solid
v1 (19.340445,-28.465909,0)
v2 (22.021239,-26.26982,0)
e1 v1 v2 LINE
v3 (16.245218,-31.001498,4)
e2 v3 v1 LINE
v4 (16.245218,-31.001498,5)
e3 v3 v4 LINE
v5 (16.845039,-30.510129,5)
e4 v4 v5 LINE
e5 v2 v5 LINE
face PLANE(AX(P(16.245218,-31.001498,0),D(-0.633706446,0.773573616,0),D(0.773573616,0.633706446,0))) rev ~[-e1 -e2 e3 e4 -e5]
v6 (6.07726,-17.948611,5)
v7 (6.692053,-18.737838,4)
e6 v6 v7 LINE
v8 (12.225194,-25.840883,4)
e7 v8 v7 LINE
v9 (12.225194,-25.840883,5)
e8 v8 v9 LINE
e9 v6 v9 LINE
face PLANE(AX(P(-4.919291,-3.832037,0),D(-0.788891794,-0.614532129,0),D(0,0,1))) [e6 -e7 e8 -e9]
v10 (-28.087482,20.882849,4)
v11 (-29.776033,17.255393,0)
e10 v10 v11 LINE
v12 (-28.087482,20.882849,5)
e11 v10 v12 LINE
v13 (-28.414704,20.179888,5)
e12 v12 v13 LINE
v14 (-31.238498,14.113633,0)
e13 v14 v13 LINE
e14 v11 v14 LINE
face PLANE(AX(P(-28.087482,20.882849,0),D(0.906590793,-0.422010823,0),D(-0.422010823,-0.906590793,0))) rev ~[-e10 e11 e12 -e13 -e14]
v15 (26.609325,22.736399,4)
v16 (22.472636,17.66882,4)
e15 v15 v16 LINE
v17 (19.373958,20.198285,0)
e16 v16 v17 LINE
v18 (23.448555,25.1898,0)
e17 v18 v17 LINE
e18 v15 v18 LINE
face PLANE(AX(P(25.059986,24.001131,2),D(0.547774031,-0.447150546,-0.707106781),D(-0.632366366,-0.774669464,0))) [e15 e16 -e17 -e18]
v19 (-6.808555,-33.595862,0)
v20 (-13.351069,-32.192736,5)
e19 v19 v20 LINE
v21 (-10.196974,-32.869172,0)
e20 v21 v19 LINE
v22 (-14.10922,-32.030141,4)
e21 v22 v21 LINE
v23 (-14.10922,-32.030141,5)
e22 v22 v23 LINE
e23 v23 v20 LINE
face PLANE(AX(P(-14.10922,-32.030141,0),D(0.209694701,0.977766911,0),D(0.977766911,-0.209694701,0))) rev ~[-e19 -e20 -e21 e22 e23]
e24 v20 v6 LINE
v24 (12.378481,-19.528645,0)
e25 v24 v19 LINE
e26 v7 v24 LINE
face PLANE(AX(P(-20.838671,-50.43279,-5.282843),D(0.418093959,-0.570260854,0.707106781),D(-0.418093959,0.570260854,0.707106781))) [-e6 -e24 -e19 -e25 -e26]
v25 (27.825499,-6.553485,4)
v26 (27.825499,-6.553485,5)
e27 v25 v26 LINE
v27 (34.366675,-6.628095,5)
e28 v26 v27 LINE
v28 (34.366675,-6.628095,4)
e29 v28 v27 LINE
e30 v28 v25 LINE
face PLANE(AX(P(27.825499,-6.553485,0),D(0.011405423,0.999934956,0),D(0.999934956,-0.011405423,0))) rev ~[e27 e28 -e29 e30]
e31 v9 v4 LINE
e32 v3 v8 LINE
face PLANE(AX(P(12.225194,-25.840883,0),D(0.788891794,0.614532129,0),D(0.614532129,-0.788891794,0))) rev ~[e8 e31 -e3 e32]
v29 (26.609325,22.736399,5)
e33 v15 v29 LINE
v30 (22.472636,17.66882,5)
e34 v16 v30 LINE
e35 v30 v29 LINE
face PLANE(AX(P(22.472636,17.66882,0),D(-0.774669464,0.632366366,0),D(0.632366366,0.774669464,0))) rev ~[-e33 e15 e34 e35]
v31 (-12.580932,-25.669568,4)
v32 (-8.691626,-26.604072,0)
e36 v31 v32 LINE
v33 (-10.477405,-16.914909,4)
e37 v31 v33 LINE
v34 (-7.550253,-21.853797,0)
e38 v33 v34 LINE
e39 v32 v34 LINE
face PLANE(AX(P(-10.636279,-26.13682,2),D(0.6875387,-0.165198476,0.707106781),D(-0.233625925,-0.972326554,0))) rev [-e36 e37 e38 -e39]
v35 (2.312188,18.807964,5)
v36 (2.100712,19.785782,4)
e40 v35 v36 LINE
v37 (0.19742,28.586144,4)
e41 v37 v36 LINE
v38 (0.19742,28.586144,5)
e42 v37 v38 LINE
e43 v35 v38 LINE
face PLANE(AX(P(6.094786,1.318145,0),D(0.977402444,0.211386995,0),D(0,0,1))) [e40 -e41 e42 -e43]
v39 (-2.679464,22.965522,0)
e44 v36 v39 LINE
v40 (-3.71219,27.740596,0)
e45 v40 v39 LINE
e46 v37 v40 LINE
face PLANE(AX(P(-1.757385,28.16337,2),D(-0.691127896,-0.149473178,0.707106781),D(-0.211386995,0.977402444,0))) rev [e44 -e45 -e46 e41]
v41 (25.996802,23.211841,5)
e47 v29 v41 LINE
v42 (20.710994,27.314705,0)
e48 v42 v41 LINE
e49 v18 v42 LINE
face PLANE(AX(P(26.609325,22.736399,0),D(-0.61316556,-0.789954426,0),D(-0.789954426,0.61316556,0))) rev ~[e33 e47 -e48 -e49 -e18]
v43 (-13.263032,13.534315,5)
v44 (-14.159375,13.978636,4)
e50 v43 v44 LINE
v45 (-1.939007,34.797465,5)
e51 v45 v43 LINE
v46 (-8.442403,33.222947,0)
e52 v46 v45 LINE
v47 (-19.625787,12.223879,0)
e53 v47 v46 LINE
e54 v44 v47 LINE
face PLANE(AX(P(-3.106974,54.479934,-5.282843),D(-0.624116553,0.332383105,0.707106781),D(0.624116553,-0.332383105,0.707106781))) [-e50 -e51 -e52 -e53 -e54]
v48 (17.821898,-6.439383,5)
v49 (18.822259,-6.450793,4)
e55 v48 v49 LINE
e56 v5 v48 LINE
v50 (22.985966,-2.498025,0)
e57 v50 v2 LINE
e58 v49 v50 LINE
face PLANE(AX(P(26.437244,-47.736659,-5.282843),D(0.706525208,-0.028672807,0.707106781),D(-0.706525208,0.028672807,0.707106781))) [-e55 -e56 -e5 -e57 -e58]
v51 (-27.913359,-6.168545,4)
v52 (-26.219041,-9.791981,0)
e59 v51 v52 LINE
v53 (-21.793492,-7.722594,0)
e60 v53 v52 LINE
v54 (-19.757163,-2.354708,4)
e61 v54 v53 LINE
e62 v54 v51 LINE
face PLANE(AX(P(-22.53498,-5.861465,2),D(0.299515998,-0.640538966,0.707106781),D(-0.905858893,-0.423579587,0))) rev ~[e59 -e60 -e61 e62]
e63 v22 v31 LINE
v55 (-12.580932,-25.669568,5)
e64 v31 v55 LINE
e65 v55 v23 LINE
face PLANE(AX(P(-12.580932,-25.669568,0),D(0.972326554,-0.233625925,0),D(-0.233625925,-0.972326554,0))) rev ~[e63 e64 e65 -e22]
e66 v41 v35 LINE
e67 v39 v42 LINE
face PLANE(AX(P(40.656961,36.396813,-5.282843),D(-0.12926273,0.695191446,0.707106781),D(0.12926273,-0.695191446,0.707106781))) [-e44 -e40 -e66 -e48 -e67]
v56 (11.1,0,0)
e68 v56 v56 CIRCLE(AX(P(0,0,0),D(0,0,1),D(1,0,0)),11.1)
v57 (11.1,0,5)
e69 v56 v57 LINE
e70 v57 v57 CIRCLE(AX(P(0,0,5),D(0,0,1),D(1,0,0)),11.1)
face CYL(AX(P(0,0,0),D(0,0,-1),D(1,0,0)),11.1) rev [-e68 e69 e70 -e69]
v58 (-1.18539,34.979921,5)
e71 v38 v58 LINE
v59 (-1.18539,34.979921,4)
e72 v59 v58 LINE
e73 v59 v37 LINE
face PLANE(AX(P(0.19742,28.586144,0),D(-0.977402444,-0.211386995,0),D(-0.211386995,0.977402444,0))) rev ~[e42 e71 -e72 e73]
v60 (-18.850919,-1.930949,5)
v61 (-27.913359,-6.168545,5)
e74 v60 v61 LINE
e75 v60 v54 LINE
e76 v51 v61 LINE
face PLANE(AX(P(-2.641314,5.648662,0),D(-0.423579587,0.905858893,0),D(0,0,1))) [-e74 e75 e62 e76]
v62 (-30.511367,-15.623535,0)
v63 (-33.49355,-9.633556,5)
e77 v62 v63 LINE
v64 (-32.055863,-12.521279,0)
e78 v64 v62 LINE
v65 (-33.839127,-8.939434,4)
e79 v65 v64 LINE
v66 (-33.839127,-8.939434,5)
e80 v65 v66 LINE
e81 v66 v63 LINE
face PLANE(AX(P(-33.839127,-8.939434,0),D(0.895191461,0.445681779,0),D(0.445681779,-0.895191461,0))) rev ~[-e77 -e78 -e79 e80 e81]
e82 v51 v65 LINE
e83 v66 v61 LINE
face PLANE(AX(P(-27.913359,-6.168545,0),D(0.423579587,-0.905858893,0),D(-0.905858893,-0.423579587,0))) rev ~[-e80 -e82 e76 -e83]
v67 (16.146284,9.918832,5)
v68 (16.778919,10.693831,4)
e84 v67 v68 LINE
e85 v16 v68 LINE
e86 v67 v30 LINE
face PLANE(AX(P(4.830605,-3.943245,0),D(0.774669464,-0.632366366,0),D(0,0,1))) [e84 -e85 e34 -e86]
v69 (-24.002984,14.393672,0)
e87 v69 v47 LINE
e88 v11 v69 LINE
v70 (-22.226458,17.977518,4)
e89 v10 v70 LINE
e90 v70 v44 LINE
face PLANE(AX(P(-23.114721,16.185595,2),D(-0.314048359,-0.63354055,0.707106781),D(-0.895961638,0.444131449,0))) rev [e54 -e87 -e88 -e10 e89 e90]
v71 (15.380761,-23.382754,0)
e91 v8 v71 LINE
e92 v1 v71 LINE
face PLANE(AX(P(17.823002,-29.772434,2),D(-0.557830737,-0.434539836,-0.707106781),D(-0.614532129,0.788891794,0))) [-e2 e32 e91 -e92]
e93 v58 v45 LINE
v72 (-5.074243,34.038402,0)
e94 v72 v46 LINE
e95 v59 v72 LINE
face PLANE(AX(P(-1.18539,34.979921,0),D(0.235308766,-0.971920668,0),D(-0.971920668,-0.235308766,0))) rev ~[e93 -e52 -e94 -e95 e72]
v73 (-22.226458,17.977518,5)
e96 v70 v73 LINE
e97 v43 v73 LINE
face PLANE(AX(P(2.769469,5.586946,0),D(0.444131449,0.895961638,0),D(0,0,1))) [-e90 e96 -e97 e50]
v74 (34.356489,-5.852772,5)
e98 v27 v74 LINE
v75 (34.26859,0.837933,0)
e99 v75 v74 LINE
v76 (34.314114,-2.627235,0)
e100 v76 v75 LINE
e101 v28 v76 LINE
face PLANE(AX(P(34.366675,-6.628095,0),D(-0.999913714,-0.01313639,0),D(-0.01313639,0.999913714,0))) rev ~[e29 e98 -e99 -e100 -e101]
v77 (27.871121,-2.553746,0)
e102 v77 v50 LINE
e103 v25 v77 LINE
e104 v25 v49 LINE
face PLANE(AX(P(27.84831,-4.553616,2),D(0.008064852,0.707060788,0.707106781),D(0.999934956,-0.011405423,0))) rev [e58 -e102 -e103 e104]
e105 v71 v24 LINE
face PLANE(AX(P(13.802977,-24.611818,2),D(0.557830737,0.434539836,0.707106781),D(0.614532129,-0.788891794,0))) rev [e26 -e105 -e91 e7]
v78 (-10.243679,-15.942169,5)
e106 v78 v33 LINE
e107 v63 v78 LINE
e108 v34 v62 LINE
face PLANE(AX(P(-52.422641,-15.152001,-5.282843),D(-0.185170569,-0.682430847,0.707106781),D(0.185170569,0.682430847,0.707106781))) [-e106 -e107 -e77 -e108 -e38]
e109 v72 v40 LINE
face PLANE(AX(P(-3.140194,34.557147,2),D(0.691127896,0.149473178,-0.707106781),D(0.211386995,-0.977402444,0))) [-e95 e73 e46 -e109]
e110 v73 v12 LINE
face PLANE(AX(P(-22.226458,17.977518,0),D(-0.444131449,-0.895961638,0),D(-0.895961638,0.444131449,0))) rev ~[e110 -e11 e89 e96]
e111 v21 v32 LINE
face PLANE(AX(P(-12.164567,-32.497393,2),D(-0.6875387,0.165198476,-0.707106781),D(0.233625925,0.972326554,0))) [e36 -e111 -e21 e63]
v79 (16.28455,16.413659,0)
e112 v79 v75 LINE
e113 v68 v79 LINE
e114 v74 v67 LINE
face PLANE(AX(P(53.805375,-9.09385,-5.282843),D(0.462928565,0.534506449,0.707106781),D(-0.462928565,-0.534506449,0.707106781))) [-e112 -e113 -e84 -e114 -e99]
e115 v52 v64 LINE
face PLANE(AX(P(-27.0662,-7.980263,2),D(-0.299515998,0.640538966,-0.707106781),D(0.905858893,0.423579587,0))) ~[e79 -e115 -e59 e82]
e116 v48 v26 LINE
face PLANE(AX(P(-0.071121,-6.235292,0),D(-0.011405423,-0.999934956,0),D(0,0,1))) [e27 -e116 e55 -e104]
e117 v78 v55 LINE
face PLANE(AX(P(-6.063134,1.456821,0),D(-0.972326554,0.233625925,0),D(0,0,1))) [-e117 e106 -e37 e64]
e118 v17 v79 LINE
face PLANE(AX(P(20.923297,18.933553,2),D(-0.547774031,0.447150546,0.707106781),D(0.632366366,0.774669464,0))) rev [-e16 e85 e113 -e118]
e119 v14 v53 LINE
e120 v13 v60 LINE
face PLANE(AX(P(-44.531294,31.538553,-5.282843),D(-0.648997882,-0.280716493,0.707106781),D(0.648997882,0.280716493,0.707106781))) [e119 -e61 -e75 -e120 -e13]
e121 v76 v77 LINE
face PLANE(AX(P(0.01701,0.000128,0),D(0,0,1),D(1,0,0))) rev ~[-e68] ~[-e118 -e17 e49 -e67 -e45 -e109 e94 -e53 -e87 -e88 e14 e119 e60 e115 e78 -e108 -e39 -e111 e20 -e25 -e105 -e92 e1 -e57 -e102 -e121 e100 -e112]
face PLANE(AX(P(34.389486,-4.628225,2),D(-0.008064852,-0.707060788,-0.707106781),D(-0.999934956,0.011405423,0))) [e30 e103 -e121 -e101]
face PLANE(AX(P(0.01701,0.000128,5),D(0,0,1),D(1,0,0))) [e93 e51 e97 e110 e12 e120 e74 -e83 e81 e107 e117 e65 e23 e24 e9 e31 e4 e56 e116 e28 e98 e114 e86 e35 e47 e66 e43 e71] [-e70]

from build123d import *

# Parameters (mm, degrees)
F0_R         = 11.1
F1_DEPTH     = 5
F2_T4_DEPTH  = 66.9224244324
F2_T10_DEPTH = 66.9224244324
F2_T16_DEPTH = 66.9224244324
F2_T22_DEPTH = 66.9224244324
F2_T28_DEPTH = 66.9224244324
F2_T34_DEPTH = 66.9224244324
F2_T40_DEPTH = 66.9224244324
F3_SIZE      = 4


# Not quite as in the source:
# - a fillet or chamfer that OpenCascade refuses, or shapes differently, is made with other operations: its cross-section is extruded or revolved along the edge and cut away or added


with BuildPart() as f1:
    # F0 (on Top) → F1 (new body)
    with BuildSketch(Plane.XY):
        with BuildLine():
            ThreePointArc((13.9102940248, -6.3947663514), (14.9558155311, -3.2730564225), (15.3097784616, 0))
            ThreePointArc((15.3097784616, 0), (14.9174264356, 3.4437922532), (13.7604803953, 6.7110726292))
            ThreePointArc((13.7604803953, 6.7110726292), (13.7168049275, 6.7998955231), (13.6725561219, 6.8884341936))
            ThreePointArc((13.6725561219, 6.8884341936), (9.4080501116, 12.077992782), (3.3325913325, 14.9426621308))
            ThreePointArc((3.3325913325, 14.9426621308), (3.2359155889, 14.9638954436), (3.1391045899, 14.9845032923))
            ThreePointArc((3.1391045899, 14.9845032923), (-3.577131702, 14.8860150924), (-9.6048069761, 11.9221222731))
            ThreePointArc((-9.6048069761, 11.9221222731), (-9.6816841888, 11.8597768872), (-9.7581567243, 11.7969357838))
            ThreePointArc((-9.7581567243, 11.7969357838), (-13.8686603838, 6.4845644188), (-15.3095897294, -0.0760188232))
            ThreePointArc((-15.3095897294, -0.0760188232), (-15.308778302, -0.1749955606), (-15.307326995, -0.2739649836))
            ThreePointArc((-15.307326995, -0.2739649836), (-13.7168049275, -6.7998955231), (-9.4859391577, -12.0169161951))
            ThreePointArc((-9.4859391577, -12.0169161951), (-9.4080501116, -12.077992782), (-9.3297678259, -12.1385645305))
            ThreePointArc((-9.3297678259, -12.1385645305), (-3.2359155889, -14.9638954436), (3.4808170776, -14.9088305717))
            ThreePointArc((3.4808170776, -14.9088305717), (3.577131702, -14.8860150924), (3.6732968087, -14.8625774043))
            ThreePointArc((3.6732968087, -14.8625774043), (9.6816841888, -11.8597768872), (13.8264470578, -6.5740914431))
            ThreePointArc((13.8264470578, -6.5740914431), (13.8686603838, -6.4845644188), (13.9102940248, -6.3947663514))
        make_face()
        Circle(F0_R, mode=Mode.SUBTRACT)
        with BuildLine():
            ThreePointArc((13.6725561219, 6.8884341936), (13.7168049275, 6.7998955231), (13.7604803953, 6.7110726292))
            Line((13.7604803953, 6.7110726292), (28.1393743339, 1.1806929027))
            Line((28.1393743339, 1.1806929027), (27.8254993307, -6.5534854768))
            Line((27.8254993307, -6.5534854768), (34.3666750494, -6.6280952053))
            Line((34.3666750494, -6.6280952053), (34.1806906403, 7.5286378152))
            Line((34.1806906403, 7.5286378152), (22.47263633, 17.6688200307))
            Line((22.47263633, 17.6688200307), (13.6725561219, 6.8884341936))
        make_face()
        with BuildLine():
            ThreePointArc((13.7604803953, 6.7110726292), (14.9174264356, 3.4437922532), (15.3097784616, 0))
            ThreePointArc((15.3097784616, 0), (14.9558155311, -3.2730564225), (13.9102940248, -6.3947663514))
            Line((13.9102940248, -6.3947663514), (27.8254993307, -6.5534854768))
            Line((27.8254993307, -6.5534854768), (28.1393743339, 1.1806929027))
            Line((28.1393743339, 1.1806929027), (13.7604803953, 6.7110726292))
        make_face()
        with BuildLine():
            Line((27.8254993307, -6.5534854768), (13.9102940248, -6.3947663514))
            ThreePointArc((13.9102940248, -6.3947663514), (13.8686603838, -6.4845644188), (13.8264470578, -6.5740914431))
            Line((13.8264470578, -6.5740914431), (18.4677158103, -21.2640987672))
            Line((18.4677158103, -21.2640987672), (12.2251937987, -25.8408827536))
            Line((12.2251937987, -25.8408827536), (16.2452179168, -31.0014982676))
            Line((16.2452179168, -31.0014982676), (27.1974380987, -22.0295111355))
            Line((27.1974380987, -22.0295111355), (27.8254993307, -6.5534854768))
        make_face()
        with BuildLine():
            Line((18.4677158103, -21.2640987672), (13.8264470578, -6.5740914431))
            ThreePointArc((13.8264470578, -6.5740914431), (9.6816841888, -11.8597768872), (3.6732968087, -14.8625774043))
            Line((3.6732968087, -14.8625774043), (12.2251937987, -25.8408827536))
            Line((12.2251937987, -25.8408827536), (18.4677158103, -21.2640987672))
        make_face()
        with BuildLine():
            Line((12.2251937987, -25.8408827536), (3.6732968087, -14.8625774043))
            ThreePointArc((3.6732968087, -14.8625774043), (3.577131702, -14.8860150924), (3.4808170776, -14.9088305717))
            Line((3.4808170776, -14.9088305717), (-5.1105093912, -27.6965903568))
            Line((-5.1105093912, -27.6965903568), (-12.5809320123, -25.669568259))
            Line((-12.5809320123, -25.669568259), (-14.1092196492, -32.0301408191))
            Line((-14.1092196492, -32.0301408191), (-0.2660400579, -34.9989888809))
            Line((-0.2660400579, -34.9989888809), (12.2251937987, -25.8408827536))
        make_face()
        with BuildLine():
            Line((-5.1105093912, -27.6965903568), (3.4808170776, -14.9088305717))
            ThreePointArc((3.4808170776, -14.9088305717), (-3.2359155889, -14.9638954436), (-9.3297678259, -12.1385645305))
            Line((-9.3297678259, -12.1385645305), (-12.5809320123, -25.669568259))
            Line((-12.5809320123, -25.669568259), (-5.1105093912, -27.6965903568))
        make_face()
        with BuildLine():
            Line((-12.5809320123, -25.669568259), (-9.3297678259, -12.1385645305))
            ThreePointArc((-9.3297678259, -12.1385645305), (-9.4080501116, -12.077992782), (-9.4859391577, -12.0169161951))
            Line((-9.4859391577, -12.0169161951), (-24.8404167857, -13.2729845003))
            Line((-24.8404167857, -13.2729845003), (-27.9133594138, -6.1685453016))
            Line((-27.9133594138, -6.1685453016), (-33.8391270437, -8.939434038))
            Line((-33.8391270437, -8.939434038), (-27.5291846246, -21.6135141498))
            Line((-27.5291846246, -21.6135141498), (-12.5809320123, -25.669568259))
        make_face()
        with BuildLine():
            ThreePointArc((-15.307326995, -0.2739649836), (-15.308778302, -0.1749955606), (-15.3095897294, -0.0760188232))
            Line((-15.3095897294, -0.0760188232), (-25.8649836884, 11.1454494045))
            Line((-25.8649836884, 11.1454494045), (-22.2264578479, 17.9775180833))
            Line((-22.2264578479, 17.9775180833), (-28.0874815819, 20.8828489049))
            Line((-28.0874815819, 20.8828489049), (-34.062291676, 8.0473775715))
            Line((-34.062291676, 8.0473775715), (-27.9133594138, -6.1685453016))
            Line((-27.9133594138, -6.1685453016), (-15.307326995, -0.2739649836))
        make_face()
        with BuildLine():
            ThreePointArc((-15.3095897294, -0.0760188232), (-13.8686603838, 6.4845644188), (-9.7581567243, 11.7969357838))
            Line((-9.7581567243, 11.7969357838), (-22.2264578479, 17.9775180833))
            Line((-22.2264578479, 17.9775180833), (-25.8649836884, 11.1454494045))
            Line((-25.8649836884, 11.1454494045), (-15.3095897294, -0.0760188232))
        make_face()
        with BuildLine():
            ThreePointArc((-9.7581567243, 11.7969357838), (-9.6816841888, 11.8597768872), (-9.6048069761, 11.9221222731))
            Line((-9.6048069761, 11.9221222731), (-7.4126903243, 27.171132582))
            Line((-7.4126903243, 27.171132582), (0.1974198146, 28.5861436769))
            Line((0.1974198146, 28.5861436769), (-1.1853896087, 34.97992069))
            Line((-1.1853896087, 34.97992069), (-14.9457983513, 31.6484298448))
            Line((-14.9457983513, 31.6484298448), (-22.2264578479, 17.9775180833))
            Line((-22.2264578479, 17.9775180833), (-9.7581567243, 11.7969357838))
        make_face()
        with BuildLine():
            ThreePointArc((-9.6048069761, 11.9221222731), (-3.577131702, 14.8860150924), (3.1391045899, 14.9845032923))
            Line((3.1391045899, 14.9845032923), (0.1974198146, 28.5861436769))
            Line((0.1974198146, 28.5861436769), (-7.4126903243, 27.171132582))
            Line((-7.4126903243, 27.171132582), (-9.6048069761, 11.9221222731))
        make_face()
        with BuildLine():
            ThreePointArc((3.1391045899, 14.9845032923), (3.2359155889, 14.9638954436), (3.3325913325, 14.9426621308))
            Line((3.3325913325, 14.9426621308), (16.6215100454, 22.7363987351))
            Line((16.6215100454, 22.7363987351), (22.47263633, 17.6688200307))
            Line((22.47263633, 17.6688200307), (26.6093249174, 22.7363987351))
            Line((26.6093249174, 22.7363987351), (15.4251859707, 31.4175689347))
            Line((15.4251859707, 31.4175689347), (0.1974198146, 28.5861436769))
            Line((0.1974198146, 28.5861436769), (3.1391045899, 14.9845032923))
        make_face()
        with BuildLine():
            ThreePointArc((3.3325913325, 14.9426621308), (9.4080501116, 12.077992782), (13.6725561219, 6.8884341936))
            Line((13.6725561219, 6.8884341936), (22.47263633, 17.6688200307))
            Line((22.47263633, 17.6688200307), (16.6215100454, 22.7363987351))
            Line((16.6215100454, 22.7363987351), (3.3325913325, 14.9426621308))
        make_face()
        with BuildLine():
            Line((-24.8404167857, -13.2729845003), (-9.4859391577, -12.0169161951))
            ThreePointArc((-9.4859391577, -12.0169161951), (-13.7168049275, -6.7998955231), (-15.307326995, -0.2739649836))
            Line((-15.307326995, -0.2739649836), (-27.9133594138, -6.1685453016))
            Line((-27.9133594138, -6.1685453016), (-24.8404167857, -13.2729845003))
        make_face()
    extrude(amount=F1_DEPTH)

    # F2: chamfer of 10 on 7 edges, made by hand


with BuildPart() as f2_tool2:
    # F2_s3 → F2_t4 (new body)
    with BuildSketch(Plane(origin=(-1.8906345765, -46.5870327993, 0), x_dir=(0, 0, 1), z_dir=(0.0405494722, 0.9991775319, 0))):
        with BuildLine():
            Line((-5.2828427125, 28.3511968353), (5.2828427125, 17.7855114104))
            Line((5.2828427125, 17.7855114104), (5.4828427125, 17.7855114104))
            ThreePointArc((5.4828427125, 17.7855114104), (5.2, 22.9269327666), (5.2, 28.0683541229))
            Line((5.2, 28.0683541229), (5, 28.2683541229))
            ThreePointArc((5, 28.2683541229), (-0.1414213562, 28.2683541229), (-5.2828427125, 28.5511968353))
            Line((-5.2828427125, 28.5511968353), (-5.2828427125, 28.3511968353))
        make_face()
    extrude(amount=F2_T4_DEPTH)

    split(bisect_by=Plane(origin=(21.7213280078, -26.5155047015, 0), x_dir=(0, 0, 1), z_dir=(-0.6337064464, 0.7735736163, 0)), keep=Keep.TOP)

    split(bisect_by=Plane(origin=(-0.0711207687, -6.2352920297, 0), x_dir=(0, 0, 1), z_dir=(-0.0114054229, -0.999934956, 0)), keep=Keep.TOP)


with BuildPart() as f1_1:
    add(f1.part)

    # F2_t1: cut F2_tool2
    add(f2_tool2.part, mode=Mode.SUBTRACT)


with BuildPart() as f2_tool8:
    # F2_s9 → F2_t10 (new body)
    with BuildSketch(Plane(origin=(-37.6020002947, -27.5683822155, 0), x_dir=(0, 0, 1), z_dir=(0.8064706334, 0.5912741475, 0))):
        with BuildLine():
            Line((-5.2828427125, 28.3511968353), (5.2828427125, 17.7855114104))
            Line((5.2828427125, 17.7855114104), (5.4828427125, 17.7855114104))
            ThreePointArc((5.4828427125, 17.7855114104), (5.2, 22.9269327666), (5.2, 28.0683541229))
            Line((5.2, 28.0683541229), (5, 28.2683541229))
            ThreePointArc((5, 28.2683541229), (-0.1414213562, 28.2683541229), (-5.2828427125, 28.5511968353))
            Line((-5.2828427125, 28.5511968353), (-5.2828427125, 28.3511968353))
        make_face()
    extrude(amount=F2_T10_DEPTH)

    split(bisect_by=Plane(origin=(-7.1876298535, -33.51456485, 0), x_dir=(0, 0, 1), z_dir=(0.2096947006, 0.9777669112, 0)), keep=Keep.TOP)

    split(bisect_by=Plane(origin=(-4.9192906851, -3.8320365361, 0), x_dir=(0, 0, 1), z_dir=(-0.7888917939, -0.6145321289, 0)), keep=Keep.TOP)


with BuildPart() as f1_2:
    add(f1_1.part)

    # F2_t7: cut F2_tool8
    add(f2_tool8.part, mode=Mode.SUBTRACT)


with BuildPart() as f2_tool14:
    # F2_s15 → F2_t16 (new body)
    with BuildSketch(Plane(origin=(-44.99829285, 12.2098224691, 0), x_dir=(0, 0, 1), z_dir=(0.9651029587, -0.2618707298, 0))):
        with BuildLine():
            Line((-5.2828427125, 28.3511968353), (5.2828427125, 17.7855114104))
            Line((5.2828427125, 17.7855114104), (5.4828427125, 17.7855114104))
            ThreePointArc((5.4828427125, 17.7855114104), (5.2, 22.9269327666), (5.2, 28.0683541229))
            Line((5.2, 28.0683541229), (5, 28.2683541229))
            ThreePointArc((5, 28.2683541229), (-0.1414213562, 28.2683541229), (-5.2828427125, 28.5511968353))
            Line((-5.2828427125, 28.5511968353), (-5.2828427125, 28.3511968353))
        make_face()
    extrude(amount=F2_T16_DEPTH)

    split(bisect_by=Plane(origin=(-30.6841558342, -15.2764740939, 0), x_dir=(0, 0, 1), z_dir=(0.895191461, 0.4456817791, 0)), keep=Keep.TOP)

    split(bisect_by=Plane(origin=(-6.0631343805, 1.4568206285, 0), x_dir=(0, 0, 1), z_dir=(-0.9723265537, 0.2336259255, 0)), keep=Keep.TOP)


with BuildPart() as f1_3:
    add(f1_2.part)

    # F2_t13: cut F2_tool14
    add(f2_tool14.part, mode=Mode.SUBTRACT)


with BuildPart() as f2_tool20:
    # F2_s21 → F2_t22 (new body)
    with BuildSketch(Plane(origin=(-18.5099530914, 42.7937817994, 0), x_dir=(0, 0, 1), z_dir=(0.3969930716, -0.9178216064, 0))):
        with BuildLine():
            Line((-5.2828427125, 28.3511968353), (5.2828427125, 17.7855114104))
            Line((5.2828427125, 17.7855114104), (5.4828427125, 17.7855114104))
            ThreePointArc((5.4828427125, 17.7855114104), (5.2, 22.9269327666), (5.2, 28.0683541229))
            Line((5.2, 28.0683541229), (5, 28.2683541229))
            ThreePointArc((5, 28.2683541229), (-0.1414213562, 28.2683541229), (-5.2828427125, 28.5511968353))
            Line((-5.2828427125, 28.5511968353), (-5.2828427125, 28.3511968353))
        make_face()
    extrude(amount=F2_T22_DEPTH)

    split(bisect_by=Plane(origin=(-31.074886629, 14.4651132382, 0), x_dir=(0, 0, 1), z_dir=(0.9065907927, -0.4220108229, 0)), keep=Keep.TOP)

    split(bisect_by=Plane(origin=(-2.6413142219, 5.6486621461, 0), x_dir=(0, 0, 1), z_dir=(-0.4235795866, 0.9058588929, 0)), keep=Keep.TOP)


with BuildPart() as f1_4:
    add(f1_3.part)

    # F2_t19: cut F2_tool20
    add(f2_tool20.part, mode=Mode.SUBTRACT)


with BuildPart() as f2_tool26:
    # F2_s27 → F2_t28 (new body)
    with BuildSketch(Plane(origin=(21.9167588793, 41.1531506007, 0), x_dir=(0, 0, 1), z_dir=(-0.4700606956, -0.8826340932, 0))):
        with BuildLine():
            Line((-5.2828427125, 28.3511968353), (5.2828427125, 17.7855114104))
            Line((5.2828427125, 17.7855114104), (5.4828427125, 17.7855114104))
            ThreePointArc((5.4828427125, 17.7855114104), (5.2, 22.9269327666), (5.2, 28.0683541229))
            Line((5.2, 28.0683541229), (5, 28.2683541229))
            ThreePointArc((5, 28.2683541229), (-0.1414213562, 28.2683541229), (-5.2828427125, 28.5511968353))
            Line((-5.2828427125, 28.5511968353), (-5.2828427125, 28.3511968353))
        make_face()
    extrude(amount=F2_T28_DEPTH)

    split(bisect_by=Plane(origin=(-8.06559398, 33.3141752674, 0), x_dir=(0, 0, 1), z_dir=(0.2353087664, -0.9719206678, 0)), keep=Keep.TOP)

    split(bisect_by=Plane(origin=(2.7694694188, 5.586945856, 0), x_dir=(0, 0, 1), z_dir=(0.4441314486, 0.8959616378, 0)), keep=Keep.TOP)


with BuildPart() as f1_5:
    add(f1_4.part)

    # F2_t25: cut F2_tool26
    add(f2_tool26.part, mode=Mode.SUBTRACT)


with BuildPart() as f2_tool32:
    # F2_s33 → F2_t34 (new body)
    with BuildSketch(Plane(origin=(45.8397043935, 8.5233576284, 0), x_dir=(0, 0, 1), z_dir=(-0.9831491715, -0.1828051054, 0))):
        with BuildLine():
            Line((-5.2828427125, 28.3511968353), (5.2828427125, 17.7855114104))
            Line((5.2828427125, 17.7855114104), (5.4828427125, 17.7855114104))
            ThreePointArc((5.4828427125, 17.7855114104), (5.2, 22.9269327666), (5.2, 28.0683541229))
            Line((5.2, 28.0683541229), (5, 28.2683541229))
            ThreePointArc((5, 28.2683541229), (-0.1414213562, 28.2683541229), (-5.2828427125, 28.5511968353))
            Line((-5.2828427125, 28.5511968353), (-5.2828427125, 28.3511968353))
        make_face()
    extrude(amount=F2_T34_DEPTH)

    split(bisect_by=Plane(origin=(21.017255444, 27.0769838349, 0), x_dir=(0, 0, 1), z_dir=(-0.6131655604, -0.7899544263, 0)), keep=Keep.TOP)

    split(bisect_by=Plane(origin=(6.0947861002, 1.3181453834, 0), x_dir=(0, 0, 1), z_dir=(0.9774024444, 0.2113869951, 0)), keep=Keep.TOP)


with BuildPart() as f1_6:
    add(f1_5.part)

    # F2_t31: cut F2_tool32
    add(f2_tool32.part, mode=Mode.SUBTRACT)


with BuildPart() as f2_tool38:
    # F2_s39 → F2_t40 (new body)
    with BuildSketch(Plane(origin=(35.2444175398, -30.5246974829, 0), x_dir=(0, 0, 1), z_dir=(-0.7559062687, 0.6546798553, 0))):
        with BuildLine():
            Line((-5.2828427125, 28.3511968353), (5.2828427125, 17.7855114104))
            Line((5.2828427125, 17.7855114104), (5.4828427125, 17.7855114104))
            ThreePointArc((5.4828427125, 17.7855114104), (5.2, 22.9269327666), (5.2, 28.0683541229))
            Line((5.2, 28.0683541229), (5, 28.2683541229))
            ThreePointArc((5, 28.2683541229), (-0.1414213562, 28.2683541229), (-5.2828427125, 28.5511968353))
            Line((-5.2828427125, 28.5511968353), (-5.2828427125, 28.3511968353))
        make_face()
    extrude(amount=F2_T40_DEPTH)

    split(bisect_by=Plane(origin=(34.2736828448, 0.4502713049, 0), x_dir=(0, 0, 1), z_dir=(-0.9999137139, -0.0131363897, 0)), keep=Keep.TOP)

    split(bisect_by=Plane(origin=(4.8306045372, -3.9432454481, 0), x_dir=(0, 0, 1), z_dir=(0.7746694642, -0.6323663663, 0)), keep=Keep.TOP)


with BuildPart() as f1_7:
    add(f1_6.part)

    # F2_t37: cut F2_tool38
    add(f2_tool38.part, mode=Mode.SUBTRACT)

    # F3
    f3_edges = [f1_7.edges().sort_by_distance(p)[0] for p in [
        (22.959393, 18.265112, 0),
        (28.595187, -6.562265, 0),
        (12.698222, -26.448123, 0),
        (-12.760763, -26.418005, 0),
        (-28.610633, -6.49459, 0),
        (-22.916113, 18.319383, 0),
        (0.034707, 29.338487, 0),
    ]]
    chamfer(f3_edges, length=F3_SIZE)


solid = f1_7.part
